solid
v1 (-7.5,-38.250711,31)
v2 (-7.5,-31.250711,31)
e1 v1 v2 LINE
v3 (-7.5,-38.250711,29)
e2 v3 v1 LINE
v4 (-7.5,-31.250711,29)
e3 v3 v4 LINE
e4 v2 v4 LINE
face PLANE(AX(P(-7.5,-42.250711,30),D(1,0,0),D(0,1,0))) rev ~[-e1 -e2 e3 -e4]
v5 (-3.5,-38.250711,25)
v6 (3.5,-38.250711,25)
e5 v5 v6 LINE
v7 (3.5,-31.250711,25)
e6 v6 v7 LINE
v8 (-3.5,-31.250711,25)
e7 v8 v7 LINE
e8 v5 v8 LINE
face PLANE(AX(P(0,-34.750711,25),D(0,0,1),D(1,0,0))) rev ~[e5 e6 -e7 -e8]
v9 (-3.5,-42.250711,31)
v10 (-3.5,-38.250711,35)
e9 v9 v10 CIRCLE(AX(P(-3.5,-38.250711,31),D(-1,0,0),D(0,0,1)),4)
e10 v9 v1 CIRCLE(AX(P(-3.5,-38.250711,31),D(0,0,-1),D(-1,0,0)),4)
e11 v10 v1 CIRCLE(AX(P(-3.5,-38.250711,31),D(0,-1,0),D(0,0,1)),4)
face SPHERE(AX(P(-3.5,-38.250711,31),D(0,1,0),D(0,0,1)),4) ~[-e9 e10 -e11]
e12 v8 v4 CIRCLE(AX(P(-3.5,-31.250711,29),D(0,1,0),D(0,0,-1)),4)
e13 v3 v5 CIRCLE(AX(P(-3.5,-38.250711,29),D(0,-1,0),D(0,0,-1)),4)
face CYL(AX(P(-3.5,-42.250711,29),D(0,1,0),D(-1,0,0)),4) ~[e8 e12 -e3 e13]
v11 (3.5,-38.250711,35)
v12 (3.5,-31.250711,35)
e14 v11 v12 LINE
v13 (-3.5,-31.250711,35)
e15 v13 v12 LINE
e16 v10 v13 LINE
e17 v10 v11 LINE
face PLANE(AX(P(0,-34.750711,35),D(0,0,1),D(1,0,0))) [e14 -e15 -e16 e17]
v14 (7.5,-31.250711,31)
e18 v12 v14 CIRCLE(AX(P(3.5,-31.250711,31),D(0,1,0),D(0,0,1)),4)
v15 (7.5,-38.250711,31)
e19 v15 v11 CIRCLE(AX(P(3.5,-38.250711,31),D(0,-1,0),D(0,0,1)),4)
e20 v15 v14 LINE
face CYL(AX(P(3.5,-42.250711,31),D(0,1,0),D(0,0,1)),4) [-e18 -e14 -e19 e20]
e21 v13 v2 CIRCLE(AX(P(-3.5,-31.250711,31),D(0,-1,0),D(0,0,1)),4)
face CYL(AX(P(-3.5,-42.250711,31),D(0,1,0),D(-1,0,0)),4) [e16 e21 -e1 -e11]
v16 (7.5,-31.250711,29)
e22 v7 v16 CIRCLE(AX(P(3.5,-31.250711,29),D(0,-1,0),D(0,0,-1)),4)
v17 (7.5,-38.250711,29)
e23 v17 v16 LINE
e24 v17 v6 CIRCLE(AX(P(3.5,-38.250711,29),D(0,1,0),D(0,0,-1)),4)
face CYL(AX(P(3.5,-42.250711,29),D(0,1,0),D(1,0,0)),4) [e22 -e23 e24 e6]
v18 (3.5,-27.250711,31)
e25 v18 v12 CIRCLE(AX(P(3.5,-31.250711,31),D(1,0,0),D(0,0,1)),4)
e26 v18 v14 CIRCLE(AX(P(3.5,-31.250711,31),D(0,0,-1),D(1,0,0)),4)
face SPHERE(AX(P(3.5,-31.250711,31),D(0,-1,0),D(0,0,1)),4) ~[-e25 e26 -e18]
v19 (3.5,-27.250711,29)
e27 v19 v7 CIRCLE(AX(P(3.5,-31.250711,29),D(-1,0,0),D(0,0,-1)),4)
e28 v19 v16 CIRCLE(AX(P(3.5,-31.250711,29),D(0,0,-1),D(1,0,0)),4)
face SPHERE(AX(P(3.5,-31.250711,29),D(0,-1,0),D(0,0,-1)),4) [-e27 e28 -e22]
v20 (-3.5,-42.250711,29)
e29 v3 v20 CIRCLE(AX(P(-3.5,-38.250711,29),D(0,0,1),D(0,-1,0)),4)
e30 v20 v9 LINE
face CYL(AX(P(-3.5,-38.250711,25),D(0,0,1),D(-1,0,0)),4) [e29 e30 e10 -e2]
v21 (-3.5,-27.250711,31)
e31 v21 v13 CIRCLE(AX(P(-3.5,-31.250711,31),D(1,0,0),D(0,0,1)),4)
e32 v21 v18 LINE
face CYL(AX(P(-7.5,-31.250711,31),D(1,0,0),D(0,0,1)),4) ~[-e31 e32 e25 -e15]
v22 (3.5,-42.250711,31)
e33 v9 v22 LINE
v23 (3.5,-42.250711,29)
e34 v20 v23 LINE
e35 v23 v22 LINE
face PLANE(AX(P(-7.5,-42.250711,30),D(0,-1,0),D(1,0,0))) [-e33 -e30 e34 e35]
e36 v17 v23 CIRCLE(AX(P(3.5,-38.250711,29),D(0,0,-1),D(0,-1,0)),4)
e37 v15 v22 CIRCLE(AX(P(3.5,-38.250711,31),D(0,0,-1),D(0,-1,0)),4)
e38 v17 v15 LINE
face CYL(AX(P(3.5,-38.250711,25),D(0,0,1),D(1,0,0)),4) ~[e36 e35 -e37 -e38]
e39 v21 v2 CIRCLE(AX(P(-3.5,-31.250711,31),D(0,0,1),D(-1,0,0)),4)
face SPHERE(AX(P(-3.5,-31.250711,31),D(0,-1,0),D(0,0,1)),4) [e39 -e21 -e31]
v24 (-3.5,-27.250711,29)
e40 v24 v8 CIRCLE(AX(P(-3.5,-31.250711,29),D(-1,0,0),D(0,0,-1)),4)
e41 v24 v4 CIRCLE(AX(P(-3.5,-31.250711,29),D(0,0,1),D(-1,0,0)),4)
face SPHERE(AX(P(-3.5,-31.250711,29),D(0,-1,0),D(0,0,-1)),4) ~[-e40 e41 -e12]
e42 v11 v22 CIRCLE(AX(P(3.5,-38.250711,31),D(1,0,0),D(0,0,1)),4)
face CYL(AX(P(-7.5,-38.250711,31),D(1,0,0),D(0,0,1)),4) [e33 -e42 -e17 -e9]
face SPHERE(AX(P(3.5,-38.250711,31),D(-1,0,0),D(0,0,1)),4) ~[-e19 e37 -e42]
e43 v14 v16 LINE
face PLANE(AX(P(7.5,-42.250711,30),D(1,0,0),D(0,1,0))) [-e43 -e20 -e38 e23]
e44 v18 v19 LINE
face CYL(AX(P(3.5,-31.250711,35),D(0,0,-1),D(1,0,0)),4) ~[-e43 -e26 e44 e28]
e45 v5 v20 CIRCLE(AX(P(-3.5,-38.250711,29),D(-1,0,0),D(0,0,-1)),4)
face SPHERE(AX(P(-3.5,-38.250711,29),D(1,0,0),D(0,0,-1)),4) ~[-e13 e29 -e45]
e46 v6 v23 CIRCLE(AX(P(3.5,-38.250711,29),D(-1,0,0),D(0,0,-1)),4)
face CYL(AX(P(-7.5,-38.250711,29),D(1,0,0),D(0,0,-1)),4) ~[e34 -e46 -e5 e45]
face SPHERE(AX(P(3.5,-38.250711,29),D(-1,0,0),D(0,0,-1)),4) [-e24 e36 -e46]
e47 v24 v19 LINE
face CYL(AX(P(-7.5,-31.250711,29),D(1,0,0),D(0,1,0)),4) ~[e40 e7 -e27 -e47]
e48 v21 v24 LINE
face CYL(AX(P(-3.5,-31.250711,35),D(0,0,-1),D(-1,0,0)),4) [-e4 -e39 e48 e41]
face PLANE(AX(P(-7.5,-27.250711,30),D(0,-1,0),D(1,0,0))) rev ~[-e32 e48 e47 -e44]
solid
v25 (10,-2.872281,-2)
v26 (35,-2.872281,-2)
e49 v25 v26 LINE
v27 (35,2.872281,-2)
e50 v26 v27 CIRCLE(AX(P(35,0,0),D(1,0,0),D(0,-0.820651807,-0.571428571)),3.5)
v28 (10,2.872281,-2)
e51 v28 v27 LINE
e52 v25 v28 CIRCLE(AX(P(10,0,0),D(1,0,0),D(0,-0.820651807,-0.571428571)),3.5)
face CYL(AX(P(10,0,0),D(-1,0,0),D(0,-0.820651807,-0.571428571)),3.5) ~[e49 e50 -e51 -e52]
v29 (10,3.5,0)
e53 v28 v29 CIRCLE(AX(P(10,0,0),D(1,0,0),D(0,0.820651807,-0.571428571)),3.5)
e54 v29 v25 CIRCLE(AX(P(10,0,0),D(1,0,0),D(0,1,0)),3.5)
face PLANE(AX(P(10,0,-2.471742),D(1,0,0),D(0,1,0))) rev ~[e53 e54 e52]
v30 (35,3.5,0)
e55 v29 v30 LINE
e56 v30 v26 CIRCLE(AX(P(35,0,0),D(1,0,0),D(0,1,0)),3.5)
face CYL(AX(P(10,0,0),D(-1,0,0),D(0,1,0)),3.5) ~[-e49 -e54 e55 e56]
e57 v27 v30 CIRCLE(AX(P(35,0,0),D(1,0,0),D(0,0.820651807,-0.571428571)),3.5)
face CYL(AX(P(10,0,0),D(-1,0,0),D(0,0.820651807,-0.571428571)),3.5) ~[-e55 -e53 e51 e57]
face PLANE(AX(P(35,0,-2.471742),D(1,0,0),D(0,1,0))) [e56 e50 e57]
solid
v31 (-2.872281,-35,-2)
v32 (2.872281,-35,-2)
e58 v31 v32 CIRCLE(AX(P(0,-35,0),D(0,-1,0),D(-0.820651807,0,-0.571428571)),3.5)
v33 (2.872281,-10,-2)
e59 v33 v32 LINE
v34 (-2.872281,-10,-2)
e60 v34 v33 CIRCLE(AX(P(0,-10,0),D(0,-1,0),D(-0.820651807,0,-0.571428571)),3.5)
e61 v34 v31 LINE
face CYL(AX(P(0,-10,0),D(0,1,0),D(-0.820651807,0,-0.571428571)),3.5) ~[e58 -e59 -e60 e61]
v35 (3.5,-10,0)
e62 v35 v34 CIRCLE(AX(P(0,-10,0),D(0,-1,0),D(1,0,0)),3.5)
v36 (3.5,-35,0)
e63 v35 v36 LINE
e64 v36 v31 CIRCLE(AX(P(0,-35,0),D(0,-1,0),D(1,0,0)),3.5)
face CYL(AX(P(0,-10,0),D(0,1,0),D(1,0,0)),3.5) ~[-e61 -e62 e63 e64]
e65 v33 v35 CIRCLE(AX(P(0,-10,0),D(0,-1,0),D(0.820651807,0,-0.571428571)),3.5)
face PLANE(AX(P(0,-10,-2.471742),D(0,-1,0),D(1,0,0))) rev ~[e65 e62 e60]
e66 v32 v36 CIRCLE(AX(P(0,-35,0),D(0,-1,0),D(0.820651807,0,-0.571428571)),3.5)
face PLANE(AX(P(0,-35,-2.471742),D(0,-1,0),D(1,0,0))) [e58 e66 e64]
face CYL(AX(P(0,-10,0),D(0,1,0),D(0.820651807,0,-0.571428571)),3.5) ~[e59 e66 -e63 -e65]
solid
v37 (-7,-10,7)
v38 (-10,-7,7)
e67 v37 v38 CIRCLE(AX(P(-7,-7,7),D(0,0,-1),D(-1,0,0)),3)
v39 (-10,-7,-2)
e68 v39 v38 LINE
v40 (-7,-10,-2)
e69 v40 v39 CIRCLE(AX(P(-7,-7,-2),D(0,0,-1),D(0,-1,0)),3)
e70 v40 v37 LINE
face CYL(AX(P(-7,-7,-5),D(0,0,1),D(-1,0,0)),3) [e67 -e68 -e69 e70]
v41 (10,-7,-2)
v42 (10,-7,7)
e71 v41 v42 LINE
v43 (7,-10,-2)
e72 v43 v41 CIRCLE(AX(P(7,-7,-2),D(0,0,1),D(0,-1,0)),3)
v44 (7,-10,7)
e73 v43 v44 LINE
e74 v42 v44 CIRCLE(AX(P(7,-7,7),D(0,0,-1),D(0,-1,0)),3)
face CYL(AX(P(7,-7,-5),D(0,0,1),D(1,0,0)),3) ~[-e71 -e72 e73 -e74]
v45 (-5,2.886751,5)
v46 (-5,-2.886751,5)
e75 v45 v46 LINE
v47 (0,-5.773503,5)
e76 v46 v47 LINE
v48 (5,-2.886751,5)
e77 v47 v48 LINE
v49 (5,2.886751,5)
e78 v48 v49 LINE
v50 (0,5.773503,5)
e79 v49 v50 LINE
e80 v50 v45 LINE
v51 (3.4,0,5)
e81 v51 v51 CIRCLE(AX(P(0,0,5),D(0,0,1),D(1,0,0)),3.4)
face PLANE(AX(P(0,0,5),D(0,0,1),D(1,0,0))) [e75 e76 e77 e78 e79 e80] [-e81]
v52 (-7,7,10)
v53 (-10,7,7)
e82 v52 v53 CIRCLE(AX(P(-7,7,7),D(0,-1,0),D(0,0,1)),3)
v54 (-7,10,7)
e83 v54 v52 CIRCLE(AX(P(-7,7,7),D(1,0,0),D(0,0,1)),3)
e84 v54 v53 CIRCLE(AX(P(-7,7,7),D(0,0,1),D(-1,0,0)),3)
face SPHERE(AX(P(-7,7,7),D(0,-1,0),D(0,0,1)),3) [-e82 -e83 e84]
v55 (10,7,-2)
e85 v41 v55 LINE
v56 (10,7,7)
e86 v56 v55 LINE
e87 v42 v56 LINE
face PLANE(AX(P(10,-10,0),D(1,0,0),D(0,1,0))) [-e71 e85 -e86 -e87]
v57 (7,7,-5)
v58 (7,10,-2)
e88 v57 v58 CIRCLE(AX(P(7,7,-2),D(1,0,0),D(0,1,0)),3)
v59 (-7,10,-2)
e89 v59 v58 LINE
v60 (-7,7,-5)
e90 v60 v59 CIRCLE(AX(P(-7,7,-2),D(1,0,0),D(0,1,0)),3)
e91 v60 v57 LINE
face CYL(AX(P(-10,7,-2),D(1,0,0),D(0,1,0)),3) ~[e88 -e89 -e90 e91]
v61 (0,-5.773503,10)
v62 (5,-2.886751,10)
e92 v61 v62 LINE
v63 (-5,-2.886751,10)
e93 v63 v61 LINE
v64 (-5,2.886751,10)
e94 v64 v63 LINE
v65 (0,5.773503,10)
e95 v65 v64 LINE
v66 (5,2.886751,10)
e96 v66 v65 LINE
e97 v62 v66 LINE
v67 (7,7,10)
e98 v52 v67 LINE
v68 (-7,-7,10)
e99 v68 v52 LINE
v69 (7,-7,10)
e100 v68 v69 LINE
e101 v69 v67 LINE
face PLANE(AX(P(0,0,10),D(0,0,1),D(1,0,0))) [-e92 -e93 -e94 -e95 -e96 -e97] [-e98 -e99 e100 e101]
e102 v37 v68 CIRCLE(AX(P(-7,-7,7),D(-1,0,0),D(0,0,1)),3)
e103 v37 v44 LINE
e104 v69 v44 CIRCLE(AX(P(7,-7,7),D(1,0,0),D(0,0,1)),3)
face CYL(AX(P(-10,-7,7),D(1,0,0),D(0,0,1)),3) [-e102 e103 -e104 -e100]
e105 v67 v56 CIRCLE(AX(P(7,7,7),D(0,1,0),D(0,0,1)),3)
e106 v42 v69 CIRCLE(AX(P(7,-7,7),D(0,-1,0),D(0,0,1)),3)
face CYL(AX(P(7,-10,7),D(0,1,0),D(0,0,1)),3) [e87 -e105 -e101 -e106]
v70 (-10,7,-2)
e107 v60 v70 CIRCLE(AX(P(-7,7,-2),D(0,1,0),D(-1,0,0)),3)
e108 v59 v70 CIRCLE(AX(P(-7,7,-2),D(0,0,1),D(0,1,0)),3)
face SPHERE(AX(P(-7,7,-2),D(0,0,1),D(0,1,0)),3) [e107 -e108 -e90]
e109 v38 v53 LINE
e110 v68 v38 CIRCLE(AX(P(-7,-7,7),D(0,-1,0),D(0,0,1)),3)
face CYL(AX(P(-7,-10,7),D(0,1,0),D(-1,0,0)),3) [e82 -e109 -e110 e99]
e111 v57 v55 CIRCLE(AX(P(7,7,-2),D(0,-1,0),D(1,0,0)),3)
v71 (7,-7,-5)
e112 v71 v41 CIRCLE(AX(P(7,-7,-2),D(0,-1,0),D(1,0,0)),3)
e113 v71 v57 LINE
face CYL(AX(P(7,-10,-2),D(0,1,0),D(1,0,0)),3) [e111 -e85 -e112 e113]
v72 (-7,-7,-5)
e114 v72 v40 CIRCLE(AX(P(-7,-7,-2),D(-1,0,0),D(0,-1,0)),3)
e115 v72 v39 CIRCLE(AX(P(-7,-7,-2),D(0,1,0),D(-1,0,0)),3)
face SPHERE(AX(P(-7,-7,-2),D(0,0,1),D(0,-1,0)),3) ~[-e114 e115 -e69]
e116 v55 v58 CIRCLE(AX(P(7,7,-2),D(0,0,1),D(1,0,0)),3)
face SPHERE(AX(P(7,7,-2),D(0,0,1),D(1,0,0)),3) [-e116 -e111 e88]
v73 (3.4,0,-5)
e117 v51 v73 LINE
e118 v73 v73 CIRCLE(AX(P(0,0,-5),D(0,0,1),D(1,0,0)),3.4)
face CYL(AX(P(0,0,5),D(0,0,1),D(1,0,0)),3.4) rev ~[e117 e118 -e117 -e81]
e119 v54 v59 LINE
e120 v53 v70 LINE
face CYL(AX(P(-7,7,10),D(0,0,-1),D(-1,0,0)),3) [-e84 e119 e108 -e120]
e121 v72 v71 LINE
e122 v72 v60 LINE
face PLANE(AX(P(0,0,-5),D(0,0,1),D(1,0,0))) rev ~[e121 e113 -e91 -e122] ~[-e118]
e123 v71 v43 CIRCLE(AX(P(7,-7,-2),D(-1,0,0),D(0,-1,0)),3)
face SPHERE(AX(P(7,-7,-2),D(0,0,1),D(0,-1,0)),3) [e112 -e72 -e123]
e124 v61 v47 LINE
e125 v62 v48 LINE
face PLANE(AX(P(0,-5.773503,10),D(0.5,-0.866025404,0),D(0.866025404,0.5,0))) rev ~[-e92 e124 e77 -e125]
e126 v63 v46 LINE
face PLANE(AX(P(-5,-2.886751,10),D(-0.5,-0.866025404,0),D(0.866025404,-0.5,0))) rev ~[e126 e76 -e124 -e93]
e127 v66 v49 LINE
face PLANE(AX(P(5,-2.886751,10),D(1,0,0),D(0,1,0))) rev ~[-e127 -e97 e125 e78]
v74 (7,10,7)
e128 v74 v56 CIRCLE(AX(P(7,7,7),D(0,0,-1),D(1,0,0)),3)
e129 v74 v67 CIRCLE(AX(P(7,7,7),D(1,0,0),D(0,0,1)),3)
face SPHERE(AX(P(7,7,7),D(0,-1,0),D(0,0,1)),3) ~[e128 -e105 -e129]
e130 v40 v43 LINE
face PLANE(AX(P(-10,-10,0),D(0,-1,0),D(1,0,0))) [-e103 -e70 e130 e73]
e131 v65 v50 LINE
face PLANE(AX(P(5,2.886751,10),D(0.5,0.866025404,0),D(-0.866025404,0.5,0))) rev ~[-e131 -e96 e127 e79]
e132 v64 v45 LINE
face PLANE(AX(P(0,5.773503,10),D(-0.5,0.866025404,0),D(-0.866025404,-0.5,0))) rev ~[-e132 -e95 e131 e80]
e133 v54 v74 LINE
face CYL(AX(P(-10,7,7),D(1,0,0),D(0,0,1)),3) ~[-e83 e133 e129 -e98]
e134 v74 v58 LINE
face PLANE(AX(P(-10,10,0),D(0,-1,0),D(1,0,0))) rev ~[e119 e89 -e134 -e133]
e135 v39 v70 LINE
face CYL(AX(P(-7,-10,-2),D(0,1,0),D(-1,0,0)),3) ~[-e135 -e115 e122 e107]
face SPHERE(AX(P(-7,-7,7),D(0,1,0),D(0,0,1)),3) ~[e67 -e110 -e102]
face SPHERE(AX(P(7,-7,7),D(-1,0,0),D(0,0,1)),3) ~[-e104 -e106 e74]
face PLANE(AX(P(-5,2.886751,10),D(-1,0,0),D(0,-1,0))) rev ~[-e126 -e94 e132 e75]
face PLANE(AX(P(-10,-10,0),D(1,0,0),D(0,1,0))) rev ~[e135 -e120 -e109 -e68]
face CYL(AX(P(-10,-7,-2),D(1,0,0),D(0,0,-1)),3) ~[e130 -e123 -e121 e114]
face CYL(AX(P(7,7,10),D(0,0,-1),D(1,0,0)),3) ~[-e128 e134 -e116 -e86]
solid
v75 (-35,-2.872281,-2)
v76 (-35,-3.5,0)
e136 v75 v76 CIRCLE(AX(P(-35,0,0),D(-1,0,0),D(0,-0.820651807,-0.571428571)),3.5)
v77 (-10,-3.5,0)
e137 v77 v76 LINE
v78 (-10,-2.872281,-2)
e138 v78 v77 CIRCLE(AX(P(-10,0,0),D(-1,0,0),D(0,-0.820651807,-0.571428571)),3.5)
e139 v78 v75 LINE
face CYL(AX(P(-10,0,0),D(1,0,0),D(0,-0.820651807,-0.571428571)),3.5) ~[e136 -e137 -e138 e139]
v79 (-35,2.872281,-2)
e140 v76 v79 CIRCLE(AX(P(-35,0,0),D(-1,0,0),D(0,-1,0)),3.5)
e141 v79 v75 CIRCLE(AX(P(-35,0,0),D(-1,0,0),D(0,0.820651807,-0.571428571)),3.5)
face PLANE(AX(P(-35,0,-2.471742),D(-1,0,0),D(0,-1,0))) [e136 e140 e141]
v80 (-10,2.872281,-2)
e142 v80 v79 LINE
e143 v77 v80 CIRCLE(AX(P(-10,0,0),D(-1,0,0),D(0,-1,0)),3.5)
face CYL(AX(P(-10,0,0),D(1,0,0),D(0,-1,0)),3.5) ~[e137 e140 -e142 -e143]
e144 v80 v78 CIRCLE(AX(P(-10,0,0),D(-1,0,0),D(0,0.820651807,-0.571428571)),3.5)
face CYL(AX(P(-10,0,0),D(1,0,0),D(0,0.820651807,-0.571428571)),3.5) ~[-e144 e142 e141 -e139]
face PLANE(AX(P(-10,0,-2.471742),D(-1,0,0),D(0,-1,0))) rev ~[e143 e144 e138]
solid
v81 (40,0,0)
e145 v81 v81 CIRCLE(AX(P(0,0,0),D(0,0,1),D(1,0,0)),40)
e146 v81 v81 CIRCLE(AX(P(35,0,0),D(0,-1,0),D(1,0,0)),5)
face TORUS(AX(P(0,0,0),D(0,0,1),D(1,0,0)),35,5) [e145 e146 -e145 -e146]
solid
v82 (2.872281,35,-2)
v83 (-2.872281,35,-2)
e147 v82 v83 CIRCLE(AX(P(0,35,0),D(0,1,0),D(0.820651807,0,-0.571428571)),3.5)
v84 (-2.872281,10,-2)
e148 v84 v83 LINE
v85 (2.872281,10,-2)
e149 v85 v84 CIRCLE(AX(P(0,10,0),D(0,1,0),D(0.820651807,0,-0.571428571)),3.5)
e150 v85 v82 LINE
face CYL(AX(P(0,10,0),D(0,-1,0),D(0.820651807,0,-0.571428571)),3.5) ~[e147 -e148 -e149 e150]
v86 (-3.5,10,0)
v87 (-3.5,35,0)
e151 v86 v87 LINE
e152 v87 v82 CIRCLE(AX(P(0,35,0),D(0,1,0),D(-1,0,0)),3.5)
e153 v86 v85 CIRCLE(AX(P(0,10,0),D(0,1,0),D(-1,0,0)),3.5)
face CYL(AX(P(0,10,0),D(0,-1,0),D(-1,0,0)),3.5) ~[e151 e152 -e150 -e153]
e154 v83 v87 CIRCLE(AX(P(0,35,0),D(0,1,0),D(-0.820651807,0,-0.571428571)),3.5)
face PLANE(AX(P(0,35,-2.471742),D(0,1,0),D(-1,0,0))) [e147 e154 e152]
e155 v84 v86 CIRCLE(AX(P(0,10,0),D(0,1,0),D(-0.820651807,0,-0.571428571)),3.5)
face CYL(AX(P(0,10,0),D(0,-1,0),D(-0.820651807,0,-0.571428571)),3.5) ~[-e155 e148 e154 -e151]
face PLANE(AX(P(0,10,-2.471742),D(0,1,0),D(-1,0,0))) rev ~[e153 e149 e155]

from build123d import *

# Parameters (mm, degrees)
F0_R           = 5
F3_W           = 20
F3_H           = 20
F4_DEPTH       = 10
F4_DEPTH_BACK  = 5
F5_R           = 3
F7_DEPTH       = 5
F8_R           = 3.4
F9_DEPTH       = 10.0010001
F11_DEPTH      = 25
F13_DEPTH      = 25
F15_DEPTH      = 25
F17_DEPTH      = 25
F21_W          = 15
F21_H          = 15
F22_DEPTH      = 5
F22_DEPTH_BACK = 5
F23_R          = 4


# Not quite as in the source:
# - the program builds the solid bodies; features that only make, move or delete a surface that nothing else refers to are left out


with BuildPart() as f2:
    # F0 (on Front) → F2 (revolve)
    with BuildSketch(Plane.XZ):
        with Locations((35, 0)):
            Circle(F0_R)
    revolve(axis=Axis((0, 0, 0), (0, 0, 1)))


with BuildPart() as f4:
    # F3 (on Top) → F4 (new body, two sides)
    with BuildSketch(Plane.XY) as f4_sk:
        Rectangle(F3_W, F3_H)
    extrude(amount=F4_DEPTH)
    extrude(f4_sk.sketch, amount=-F4_DEPTH_BACK)

    # F5
    f5_edges = [f4.edges().sort_by_distance(p)[0] for p in [
        (-10, 0, 10),
        (0, -10, 10),
        (10, 0, 10),
        (0, 10, 10),
        (10, -10, 2.5),
        (-10, -10, 2.5),
        (10, 10, 2.5),
        (-10, 10, 2.5),
        (0, -10, -5),
        (10, 0, -5),
        (0, 10, -5),
        (-10, 0, -5),
    ]]
    fillet(f5_edges, radius=F5_R)

    # F6 (on face) → F7 (cut)
    with BuildSketch(Plane.XY.offset(10)):
        Polygon((0, -5.7735026919), (5, -2.8867513459), (5, 2.8867513459), (0, 5.7735026919), (-5, 2.8867513459), (-5, -2.8867513459), align=None)
    extrude(amount=-F7_DEPTH, mode=Mode.SUBTRACT)

    # F8 (on face) → F9 (cut, through all)
    with BuildSketch(Plane.XY.offset(5)):
        Circle(F8_R)
    extrude(amount=-F9_DEPTH, mode=Mode.SUBTRACT)


with BuildPart() as f11:
    # F10 (on face) → F11 (new body)
    with BuildSketch(Plane.YZ.offset(10)):
        with BuildLine():
            Line((2.8722813233, -2), (-2.8722813233, -2))
            ThreePointArc((-2.8722813233, -2), (0, -3.5), (2.8722813233, -2))
        make_face()
        with BuildLine():
            ThreePointArc((2.8722813233, -2), (3.3393850206, -1.0480971731), (3.5, 0))
            ThreePointArc((3.5, 0), (-1.0480971731, 3.3393850206), (-2.8722813233, -2))
            Line((-2.8722813233, -2), (2.8722813233, -2))
        make_face()
    extrude(amount=F11_DEPTH)


with BuildPart() as f13:
    # F12 (on face) → F13 (new body)
    with BuildSketch(Plane(origin=(-10, 0, 0), x_dir=(0, -1, 0), z_dir=(-1, 0, 0))):
        with BuildLine():
            Line((2.8722813233, -2), (-2.8722813233, -2))
            ThreePointArc((-2.8722813233, -2), (0, -3.5), (2.8722813233, -2))
        make_face()
        with BuildLine():
            ThreePointArc((2.8722813233, -2), (3.3393850206, -1.0480971731), (3.5, 0))
            ThreePointArc((3.5, 0), (-1.0480971731, 3.3393850206), (-2.8722813233, -2))
            Line((-2.8722813233, -2), (2.8722813233, -2))
        make_face()
    extrude(amount=F13_DEPTH)


with BuildPart() as f15:
    # F14 (on face) → F15 (new body)
    with BuildSketch(Plane(origin=(0, 10, 0), x_dir=(-1, 0, 0), z_dir=(0, 1, 0))):
        with BuildLine():
            Line((2.8722813233, -2), (-2.8722813233, -2))
            ThreePointArc((-2.8722813233, -2), (0, -3.5), (2.8722813233, -2))
        make_face()
        with BuildLine():
            ThreePointArc((2.8722813233, -2), (3.3393850206, -1.0480971731), (3.5, 0))
            ThreePointArc((3.5, 0), (-1.0480971731, 3.3393850206), (-2.8722813233, -2))
            Line((-2.8722813233, -2), (2.8722813233, -2))
        make_face()
    extrude(amount=F15_DEPTH)


with BuildPart() as f17:
    # F16 (on face) → F17 (new body)
    with BuildSketch(Plane.XZ.offset(10)):
        with BuildLine():
            Line((2.8722813233, -2), (-2.8722813233, -2))
            ThreePointArc((-2.8722813233, -2), (0, -3.5), (2.8722813233, -2))
        make_face()
        with BuildLine():
            ThreePointArc((2.8722813233, -2), (3.3393850206, -1.0480971731), (3.5, 0))
            ThreePointArc((3.5, 0), (-1.0480971731, 3.3393850206), (-2.8722813233, -2))
            Line((-2.8722813233, -2), (2.8722813233, -2))
        make_face()
    extrude(amount=F17_DEPTH)


with BuildPart() as f22:
    # F21 (on offset) → F22 (new body, two sides)
    with BuildSketch(Plane.XY.offset(30)) as f22_sk:
        with Locations((0, -34.750711027)):
            Rectangle(F21_W, F21_H)
    extrude(amount=F22_DEPTH)
    extrude(f22_sk.sketch, amount=-F22_DEPTH_BACK)

    # F23
    f23_edges = [f22.edges().sort_by_distance(p)[0] for p in [
        (-7.5, -34.750711, 35),
        (0, -42.250711, 35),
        (7.5, -34.750711, 35),
        (0, -27.250711, 35),
        (0, -42.250711, 25),
        (-7.5, -34.750711, 25),
        (7.5, -34.750711, 25),
        (0, -27.250711, 25),
        (-7.5, -42.250711, 30),
        (7.5, -42.250711, 30),
        (7.5, -27.250711, 30),
        (-7.5, -27.250711, 30),
    ]]
    fillet(f23_edges, radius=F23_R)


solid = Compound([f2.part, f4.part, f11.part, f13.part, f15.part, f17.part, f22.part])
